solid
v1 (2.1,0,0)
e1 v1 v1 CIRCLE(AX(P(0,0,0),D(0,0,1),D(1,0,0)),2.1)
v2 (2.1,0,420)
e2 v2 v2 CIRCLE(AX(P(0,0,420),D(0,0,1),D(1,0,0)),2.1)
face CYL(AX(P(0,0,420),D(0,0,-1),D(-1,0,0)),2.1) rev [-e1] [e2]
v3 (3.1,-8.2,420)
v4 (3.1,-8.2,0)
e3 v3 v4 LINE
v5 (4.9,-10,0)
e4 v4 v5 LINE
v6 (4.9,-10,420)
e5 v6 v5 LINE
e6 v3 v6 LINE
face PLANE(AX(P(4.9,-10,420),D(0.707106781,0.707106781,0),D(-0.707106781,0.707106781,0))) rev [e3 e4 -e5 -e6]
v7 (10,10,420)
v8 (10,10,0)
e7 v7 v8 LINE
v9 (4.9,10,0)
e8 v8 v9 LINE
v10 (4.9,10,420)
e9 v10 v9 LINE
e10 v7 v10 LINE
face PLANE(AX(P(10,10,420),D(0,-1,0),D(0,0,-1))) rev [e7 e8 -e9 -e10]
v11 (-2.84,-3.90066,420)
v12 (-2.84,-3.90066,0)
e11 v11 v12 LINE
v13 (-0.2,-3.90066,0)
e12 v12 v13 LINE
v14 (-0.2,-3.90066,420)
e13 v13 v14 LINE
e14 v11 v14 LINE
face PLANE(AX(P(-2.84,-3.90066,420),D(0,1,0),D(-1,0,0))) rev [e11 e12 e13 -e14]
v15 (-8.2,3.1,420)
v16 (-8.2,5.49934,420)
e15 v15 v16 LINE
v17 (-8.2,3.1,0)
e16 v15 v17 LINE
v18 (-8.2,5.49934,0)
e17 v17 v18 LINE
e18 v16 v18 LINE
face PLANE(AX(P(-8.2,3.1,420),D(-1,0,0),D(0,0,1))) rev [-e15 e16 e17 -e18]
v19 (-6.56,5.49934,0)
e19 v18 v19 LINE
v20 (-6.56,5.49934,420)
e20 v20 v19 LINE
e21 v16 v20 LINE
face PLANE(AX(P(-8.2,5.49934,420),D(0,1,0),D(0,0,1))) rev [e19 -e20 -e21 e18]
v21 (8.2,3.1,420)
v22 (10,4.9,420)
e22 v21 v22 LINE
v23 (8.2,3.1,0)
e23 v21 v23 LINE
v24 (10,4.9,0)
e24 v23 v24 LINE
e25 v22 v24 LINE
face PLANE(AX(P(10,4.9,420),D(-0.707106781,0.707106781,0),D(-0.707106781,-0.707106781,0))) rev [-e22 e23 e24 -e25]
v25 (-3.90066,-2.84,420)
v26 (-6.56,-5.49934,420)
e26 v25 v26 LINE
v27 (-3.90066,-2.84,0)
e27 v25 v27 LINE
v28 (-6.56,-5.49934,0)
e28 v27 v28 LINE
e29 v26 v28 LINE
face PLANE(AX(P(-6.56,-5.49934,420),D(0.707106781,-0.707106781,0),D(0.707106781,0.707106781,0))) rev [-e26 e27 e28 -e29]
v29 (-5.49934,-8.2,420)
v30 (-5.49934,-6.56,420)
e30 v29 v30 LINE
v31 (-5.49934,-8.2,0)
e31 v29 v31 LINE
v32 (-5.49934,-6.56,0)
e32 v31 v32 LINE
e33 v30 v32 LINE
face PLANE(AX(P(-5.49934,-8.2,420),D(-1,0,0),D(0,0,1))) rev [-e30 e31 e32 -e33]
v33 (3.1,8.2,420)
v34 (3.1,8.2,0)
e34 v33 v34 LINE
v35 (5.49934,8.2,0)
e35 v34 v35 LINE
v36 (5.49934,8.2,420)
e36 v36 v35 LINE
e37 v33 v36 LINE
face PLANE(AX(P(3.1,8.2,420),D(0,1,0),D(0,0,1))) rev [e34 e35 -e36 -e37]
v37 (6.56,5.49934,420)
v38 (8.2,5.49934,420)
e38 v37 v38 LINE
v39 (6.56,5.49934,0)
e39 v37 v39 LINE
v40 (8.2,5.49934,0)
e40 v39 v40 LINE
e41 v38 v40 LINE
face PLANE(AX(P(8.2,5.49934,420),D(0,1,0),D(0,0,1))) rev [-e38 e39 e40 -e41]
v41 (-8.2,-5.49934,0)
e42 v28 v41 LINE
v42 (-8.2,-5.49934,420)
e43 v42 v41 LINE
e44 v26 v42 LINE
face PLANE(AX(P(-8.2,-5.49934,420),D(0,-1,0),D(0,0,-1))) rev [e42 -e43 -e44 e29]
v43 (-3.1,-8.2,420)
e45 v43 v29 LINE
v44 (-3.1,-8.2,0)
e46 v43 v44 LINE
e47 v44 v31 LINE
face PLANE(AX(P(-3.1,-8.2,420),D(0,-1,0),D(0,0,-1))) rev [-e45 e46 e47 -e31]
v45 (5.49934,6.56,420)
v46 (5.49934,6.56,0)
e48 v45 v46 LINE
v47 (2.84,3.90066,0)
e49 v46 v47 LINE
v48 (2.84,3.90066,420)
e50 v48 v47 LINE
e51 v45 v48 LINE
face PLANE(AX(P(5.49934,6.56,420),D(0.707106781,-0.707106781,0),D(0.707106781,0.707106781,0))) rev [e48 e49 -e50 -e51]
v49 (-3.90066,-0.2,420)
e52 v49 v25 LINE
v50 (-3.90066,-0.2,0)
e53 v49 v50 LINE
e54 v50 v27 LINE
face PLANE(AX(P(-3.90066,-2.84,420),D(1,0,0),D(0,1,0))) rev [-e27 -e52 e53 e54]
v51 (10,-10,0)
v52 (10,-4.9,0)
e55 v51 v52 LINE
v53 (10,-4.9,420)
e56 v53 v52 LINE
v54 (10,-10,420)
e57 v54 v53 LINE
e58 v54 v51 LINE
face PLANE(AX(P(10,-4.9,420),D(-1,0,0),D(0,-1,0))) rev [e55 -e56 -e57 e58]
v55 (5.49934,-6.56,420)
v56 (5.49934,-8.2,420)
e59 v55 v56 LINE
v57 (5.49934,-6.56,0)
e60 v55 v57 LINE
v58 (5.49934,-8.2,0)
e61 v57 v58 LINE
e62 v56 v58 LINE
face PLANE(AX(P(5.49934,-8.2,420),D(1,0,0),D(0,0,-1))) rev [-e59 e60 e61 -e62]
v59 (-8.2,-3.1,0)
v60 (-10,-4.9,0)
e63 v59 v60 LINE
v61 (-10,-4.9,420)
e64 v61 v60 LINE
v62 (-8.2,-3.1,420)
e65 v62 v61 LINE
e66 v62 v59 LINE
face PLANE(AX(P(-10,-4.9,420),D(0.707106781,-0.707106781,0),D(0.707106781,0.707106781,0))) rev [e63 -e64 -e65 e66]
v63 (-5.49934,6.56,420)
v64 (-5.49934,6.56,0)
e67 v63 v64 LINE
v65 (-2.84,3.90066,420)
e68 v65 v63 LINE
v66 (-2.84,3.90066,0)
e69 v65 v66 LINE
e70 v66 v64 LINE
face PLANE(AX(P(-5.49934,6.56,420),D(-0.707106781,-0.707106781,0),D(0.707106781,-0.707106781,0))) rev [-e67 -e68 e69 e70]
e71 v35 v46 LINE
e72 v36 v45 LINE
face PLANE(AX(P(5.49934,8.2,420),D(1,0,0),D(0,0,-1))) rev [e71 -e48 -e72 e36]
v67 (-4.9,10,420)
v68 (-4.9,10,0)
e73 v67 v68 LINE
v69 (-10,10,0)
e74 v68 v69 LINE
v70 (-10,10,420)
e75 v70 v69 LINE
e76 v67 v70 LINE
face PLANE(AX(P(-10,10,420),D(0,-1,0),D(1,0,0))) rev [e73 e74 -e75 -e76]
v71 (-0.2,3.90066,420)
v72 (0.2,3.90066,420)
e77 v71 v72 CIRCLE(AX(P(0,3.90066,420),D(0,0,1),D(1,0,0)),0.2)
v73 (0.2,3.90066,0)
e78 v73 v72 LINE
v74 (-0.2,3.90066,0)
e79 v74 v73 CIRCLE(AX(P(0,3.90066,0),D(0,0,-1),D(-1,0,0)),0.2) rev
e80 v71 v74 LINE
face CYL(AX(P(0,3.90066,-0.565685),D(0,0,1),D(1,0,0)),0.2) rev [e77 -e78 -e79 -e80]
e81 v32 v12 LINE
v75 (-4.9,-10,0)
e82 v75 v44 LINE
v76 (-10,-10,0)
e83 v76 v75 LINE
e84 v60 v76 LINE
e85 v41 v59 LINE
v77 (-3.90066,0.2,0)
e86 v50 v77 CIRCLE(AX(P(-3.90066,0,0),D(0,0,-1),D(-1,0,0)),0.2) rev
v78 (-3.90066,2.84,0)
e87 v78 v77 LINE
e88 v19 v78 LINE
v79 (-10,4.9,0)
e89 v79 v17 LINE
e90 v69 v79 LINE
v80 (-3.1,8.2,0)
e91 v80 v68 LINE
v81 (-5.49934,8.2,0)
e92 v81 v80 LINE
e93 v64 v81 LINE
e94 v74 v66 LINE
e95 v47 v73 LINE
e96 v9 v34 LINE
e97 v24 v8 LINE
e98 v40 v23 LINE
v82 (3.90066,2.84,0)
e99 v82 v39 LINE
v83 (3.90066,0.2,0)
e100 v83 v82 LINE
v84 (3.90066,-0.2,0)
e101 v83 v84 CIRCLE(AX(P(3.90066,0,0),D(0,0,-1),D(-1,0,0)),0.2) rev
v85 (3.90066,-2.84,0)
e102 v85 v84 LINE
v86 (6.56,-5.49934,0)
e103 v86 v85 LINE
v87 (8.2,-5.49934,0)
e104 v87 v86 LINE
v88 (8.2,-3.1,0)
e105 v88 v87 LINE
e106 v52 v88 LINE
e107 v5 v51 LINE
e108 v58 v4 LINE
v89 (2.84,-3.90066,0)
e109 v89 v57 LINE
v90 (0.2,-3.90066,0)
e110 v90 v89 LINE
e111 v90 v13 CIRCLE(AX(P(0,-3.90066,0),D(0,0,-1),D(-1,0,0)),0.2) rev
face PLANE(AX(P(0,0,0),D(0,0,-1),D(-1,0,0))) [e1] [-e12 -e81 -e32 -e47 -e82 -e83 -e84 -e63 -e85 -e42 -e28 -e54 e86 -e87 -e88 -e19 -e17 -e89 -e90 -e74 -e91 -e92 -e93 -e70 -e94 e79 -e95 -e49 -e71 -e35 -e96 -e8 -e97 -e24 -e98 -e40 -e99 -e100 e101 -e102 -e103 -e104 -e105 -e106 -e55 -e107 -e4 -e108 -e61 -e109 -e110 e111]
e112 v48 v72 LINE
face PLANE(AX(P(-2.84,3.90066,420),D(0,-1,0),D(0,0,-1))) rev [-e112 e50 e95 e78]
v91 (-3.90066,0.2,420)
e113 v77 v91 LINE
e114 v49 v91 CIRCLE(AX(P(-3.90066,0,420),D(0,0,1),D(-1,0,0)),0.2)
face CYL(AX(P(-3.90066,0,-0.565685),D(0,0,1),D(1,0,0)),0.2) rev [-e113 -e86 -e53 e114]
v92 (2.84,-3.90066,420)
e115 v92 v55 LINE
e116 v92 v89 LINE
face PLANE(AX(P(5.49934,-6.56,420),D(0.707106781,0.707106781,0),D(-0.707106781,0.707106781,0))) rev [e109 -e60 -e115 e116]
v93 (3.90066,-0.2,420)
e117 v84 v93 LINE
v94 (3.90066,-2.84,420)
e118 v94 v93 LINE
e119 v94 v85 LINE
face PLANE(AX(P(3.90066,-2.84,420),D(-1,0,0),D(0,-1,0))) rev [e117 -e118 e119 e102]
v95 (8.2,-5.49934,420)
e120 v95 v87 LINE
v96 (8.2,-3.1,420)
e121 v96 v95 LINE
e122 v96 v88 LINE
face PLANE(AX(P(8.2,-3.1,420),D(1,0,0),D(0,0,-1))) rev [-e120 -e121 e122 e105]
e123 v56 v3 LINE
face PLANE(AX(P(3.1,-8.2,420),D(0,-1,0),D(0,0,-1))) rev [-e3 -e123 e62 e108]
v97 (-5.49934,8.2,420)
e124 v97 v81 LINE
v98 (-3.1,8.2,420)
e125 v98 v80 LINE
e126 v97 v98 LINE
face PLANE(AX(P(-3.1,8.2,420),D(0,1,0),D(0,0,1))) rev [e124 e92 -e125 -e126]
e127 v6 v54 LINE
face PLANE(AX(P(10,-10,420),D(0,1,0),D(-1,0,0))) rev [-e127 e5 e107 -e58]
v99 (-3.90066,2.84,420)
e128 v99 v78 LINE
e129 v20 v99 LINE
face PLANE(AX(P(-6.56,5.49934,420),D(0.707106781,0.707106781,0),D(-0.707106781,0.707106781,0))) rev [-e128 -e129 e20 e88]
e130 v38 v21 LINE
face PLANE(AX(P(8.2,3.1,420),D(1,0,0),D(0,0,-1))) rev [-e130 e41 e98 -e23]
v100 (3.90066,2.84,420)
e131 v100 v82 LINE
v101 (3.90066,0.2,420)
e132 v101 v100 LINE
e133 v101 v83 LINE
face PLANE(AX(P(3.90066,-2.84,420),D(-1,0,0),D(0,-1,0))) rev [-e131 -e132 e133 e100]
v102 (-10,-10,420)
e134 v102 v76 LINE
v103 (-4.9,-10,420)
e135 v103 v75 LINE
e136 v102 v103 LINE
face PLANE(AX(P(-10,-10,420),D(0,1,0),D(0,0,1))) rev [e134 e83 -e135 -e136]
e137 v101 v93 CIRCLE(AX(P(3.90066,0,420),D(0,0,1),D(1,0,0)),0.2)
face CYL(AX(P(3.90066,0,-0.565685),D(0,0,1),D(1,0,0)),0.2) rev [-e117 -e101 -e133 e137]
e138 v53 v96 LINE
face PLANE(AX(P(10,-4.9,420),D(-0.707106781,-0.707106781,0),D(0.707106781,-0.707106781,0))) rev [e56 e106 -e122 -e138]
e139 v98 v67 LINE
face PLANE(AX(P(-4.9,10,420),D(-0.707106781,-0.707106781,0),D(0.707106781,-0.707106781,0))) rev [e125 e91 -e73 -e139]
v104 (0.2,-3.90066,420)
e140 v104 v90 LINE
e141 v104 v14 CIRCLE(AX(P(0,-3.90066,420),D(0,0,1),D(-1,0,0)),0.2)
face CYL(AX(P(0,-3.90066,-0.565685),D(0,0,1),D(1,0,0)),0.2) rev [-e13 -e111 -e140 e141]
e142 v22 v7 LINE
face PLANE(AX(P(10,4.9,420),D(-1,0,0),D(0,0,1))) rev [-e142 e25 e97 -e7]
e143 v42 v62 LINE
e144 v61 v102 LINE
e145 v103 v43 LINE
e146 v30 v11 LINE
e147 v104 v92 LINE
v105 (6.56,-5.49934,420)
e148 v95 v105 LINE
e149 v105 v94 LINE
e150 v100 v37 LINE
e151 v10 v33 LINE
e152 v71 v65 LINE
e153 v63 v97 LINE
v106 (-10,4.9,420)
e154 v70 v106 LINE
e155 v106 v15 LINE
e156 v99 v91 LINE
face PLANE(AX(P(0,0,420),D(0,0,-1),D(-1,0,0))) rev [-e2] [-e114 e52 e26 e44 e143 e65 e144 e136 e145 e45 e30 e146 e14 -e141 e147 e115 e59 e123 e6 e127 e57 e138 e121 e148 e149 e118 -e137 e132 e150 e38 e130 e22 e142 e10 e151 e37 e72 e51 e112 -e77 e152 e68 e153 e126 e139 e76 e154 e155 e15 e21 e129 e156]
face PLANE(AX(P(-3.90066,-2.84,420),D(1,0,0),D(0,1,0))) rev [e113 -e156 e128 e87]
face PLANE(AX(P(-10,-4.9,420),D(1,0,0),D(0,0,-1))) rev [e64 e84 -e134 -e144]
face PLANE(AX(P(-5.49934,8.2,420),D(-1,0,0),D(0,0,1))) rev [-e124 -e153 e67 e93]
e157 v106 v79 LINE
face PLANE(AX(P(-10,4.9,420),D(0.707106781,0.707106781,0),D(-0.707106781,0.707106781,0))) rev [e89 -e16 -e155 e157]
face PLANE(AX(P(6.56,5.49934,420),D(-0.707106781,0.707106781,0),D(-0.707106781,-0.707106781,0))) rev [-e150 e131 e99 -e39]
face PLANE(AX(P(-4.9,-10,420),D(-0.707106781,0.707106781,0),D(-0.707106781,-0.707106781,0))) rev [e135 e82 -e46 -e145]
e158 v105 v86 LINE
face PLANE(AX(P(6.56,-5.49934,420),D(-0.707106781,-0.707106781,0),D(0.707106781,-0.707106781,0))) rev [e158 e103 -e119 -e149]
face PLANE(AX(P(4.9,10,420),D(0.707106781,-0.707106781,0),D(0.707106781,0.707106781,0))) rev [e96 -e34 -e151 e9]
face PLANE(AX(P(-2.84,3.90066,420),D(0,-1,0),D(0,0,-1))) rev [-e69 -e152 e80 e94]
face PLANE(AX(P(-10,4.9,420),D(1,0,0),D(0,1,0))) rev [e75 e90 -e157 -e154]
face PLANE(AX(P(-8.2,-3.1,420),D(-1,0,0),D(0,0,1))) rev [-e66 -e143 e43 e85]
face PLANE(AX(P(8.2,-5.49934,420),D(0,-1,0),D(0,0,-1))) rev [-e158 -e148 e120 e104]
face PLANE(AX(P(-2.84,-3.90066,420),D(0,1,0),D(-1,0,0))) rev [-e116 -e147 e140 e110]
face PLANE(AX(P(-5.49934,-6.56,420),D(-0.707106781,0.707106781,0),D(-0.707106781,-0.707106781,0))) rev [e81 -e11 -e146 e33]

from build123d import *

# Parameters (mm, degrees)
SKETCH1_R           = 2.1
BOSS_EXTRUDE1_DEPTH = 420
CUT_EXTRUDE1_DEPTH  = 420


# Read off the part's stored shape, not the designer's step: Cut-Extrude1
with BuildPart() as part:
    # Sketch1 → Boss-Extrude1 (new body)
    with BuildSketch(Plane.XY):
        Polygon((-10, -4.9), (-10, -10), (-4.9, -10), (-3.1, -8.2), (-5.499339828, -8.2), (-5.499339828, -6.56), (-2.84, -3.900660172), (2.84, -3.900660172), (5.499339828, -6.56), (5.499339828, -8.2), (3.1, -8.2), (4.9, -10), (10, -10), (10, -4.9), (8.2, -3.1), (8.2, -5.499339828), (6.56, -5.499339828), (3.900660172, -2.84), (3.900660172, 2.84), (6.56, 5.499339828), (8.2, 5.499339828), (8.2, 3.1), (10, 4.9), (10, 10), (4.9, 10), (3.1, 8.2), (5.499339828, 8.2), (5.499339828, 6.56), (2.84, 3.900660172), (-2.84, 3.900660172), (-5.499339828, 6.56), (-5.499339828, 8.2), (-3.1, 8.2), (-4.9, 10), (-10, 10), (-10, 4.9), (-8.2, 3.1), (-8.2, 5.499339828), (-6.56, 5.499339828), (-3.900660172, 2.84), (-3.900660172, -2.84), (-6.56, -5.499339828), (-8.2, -5.499339828), (-8.2, -3.1), align=None)
        Circle(SKETCH1_R, mode=Mode.SUBTRACT)
    extrude(amount=BOSS_EXTRUDE1_DEPTH)

    # Cut-Extrude1 outline → Cut-Extrude1 (cut)
    with BuildSketch(Plane.XY):
        with BuildLine():
            Line((-3.900660172, 0.2), (-3.900660172, -0.2))
            ThreePointArc((-3.900660172, -0.2), (-3.700660172, 0), (-3.900660172, 0.2))
        make_face()
        with BuildLine():
            Line((0.2, 3.900660172), (-0.2, 3.900660172))
            ThreePointArc((-0.2, 3.900660172), (0, 3.700660172), (0.2, 3.900660172))
        make_face()
        with BuildLine():
            Line((3.900660172, -0.2), (3.900660172, 0.2))
            ThreePointArc((3.900660172, 0.2), (3.700660172, 0), (3.900660172, -0.2))
        make_face()
        with BuildLine():
            Line((-0.2, -3.900660172), (0.2, -3.900660172))
            ThreePointArc((0.2, -3.900660172), (0, -3.700660172), (-0.2, -3.900660172))
        make_face()
    extrude(amount=CUT_EXTRUDE1_DEPTH, mode=Mode.SUBTRACT)


solid = part.part
